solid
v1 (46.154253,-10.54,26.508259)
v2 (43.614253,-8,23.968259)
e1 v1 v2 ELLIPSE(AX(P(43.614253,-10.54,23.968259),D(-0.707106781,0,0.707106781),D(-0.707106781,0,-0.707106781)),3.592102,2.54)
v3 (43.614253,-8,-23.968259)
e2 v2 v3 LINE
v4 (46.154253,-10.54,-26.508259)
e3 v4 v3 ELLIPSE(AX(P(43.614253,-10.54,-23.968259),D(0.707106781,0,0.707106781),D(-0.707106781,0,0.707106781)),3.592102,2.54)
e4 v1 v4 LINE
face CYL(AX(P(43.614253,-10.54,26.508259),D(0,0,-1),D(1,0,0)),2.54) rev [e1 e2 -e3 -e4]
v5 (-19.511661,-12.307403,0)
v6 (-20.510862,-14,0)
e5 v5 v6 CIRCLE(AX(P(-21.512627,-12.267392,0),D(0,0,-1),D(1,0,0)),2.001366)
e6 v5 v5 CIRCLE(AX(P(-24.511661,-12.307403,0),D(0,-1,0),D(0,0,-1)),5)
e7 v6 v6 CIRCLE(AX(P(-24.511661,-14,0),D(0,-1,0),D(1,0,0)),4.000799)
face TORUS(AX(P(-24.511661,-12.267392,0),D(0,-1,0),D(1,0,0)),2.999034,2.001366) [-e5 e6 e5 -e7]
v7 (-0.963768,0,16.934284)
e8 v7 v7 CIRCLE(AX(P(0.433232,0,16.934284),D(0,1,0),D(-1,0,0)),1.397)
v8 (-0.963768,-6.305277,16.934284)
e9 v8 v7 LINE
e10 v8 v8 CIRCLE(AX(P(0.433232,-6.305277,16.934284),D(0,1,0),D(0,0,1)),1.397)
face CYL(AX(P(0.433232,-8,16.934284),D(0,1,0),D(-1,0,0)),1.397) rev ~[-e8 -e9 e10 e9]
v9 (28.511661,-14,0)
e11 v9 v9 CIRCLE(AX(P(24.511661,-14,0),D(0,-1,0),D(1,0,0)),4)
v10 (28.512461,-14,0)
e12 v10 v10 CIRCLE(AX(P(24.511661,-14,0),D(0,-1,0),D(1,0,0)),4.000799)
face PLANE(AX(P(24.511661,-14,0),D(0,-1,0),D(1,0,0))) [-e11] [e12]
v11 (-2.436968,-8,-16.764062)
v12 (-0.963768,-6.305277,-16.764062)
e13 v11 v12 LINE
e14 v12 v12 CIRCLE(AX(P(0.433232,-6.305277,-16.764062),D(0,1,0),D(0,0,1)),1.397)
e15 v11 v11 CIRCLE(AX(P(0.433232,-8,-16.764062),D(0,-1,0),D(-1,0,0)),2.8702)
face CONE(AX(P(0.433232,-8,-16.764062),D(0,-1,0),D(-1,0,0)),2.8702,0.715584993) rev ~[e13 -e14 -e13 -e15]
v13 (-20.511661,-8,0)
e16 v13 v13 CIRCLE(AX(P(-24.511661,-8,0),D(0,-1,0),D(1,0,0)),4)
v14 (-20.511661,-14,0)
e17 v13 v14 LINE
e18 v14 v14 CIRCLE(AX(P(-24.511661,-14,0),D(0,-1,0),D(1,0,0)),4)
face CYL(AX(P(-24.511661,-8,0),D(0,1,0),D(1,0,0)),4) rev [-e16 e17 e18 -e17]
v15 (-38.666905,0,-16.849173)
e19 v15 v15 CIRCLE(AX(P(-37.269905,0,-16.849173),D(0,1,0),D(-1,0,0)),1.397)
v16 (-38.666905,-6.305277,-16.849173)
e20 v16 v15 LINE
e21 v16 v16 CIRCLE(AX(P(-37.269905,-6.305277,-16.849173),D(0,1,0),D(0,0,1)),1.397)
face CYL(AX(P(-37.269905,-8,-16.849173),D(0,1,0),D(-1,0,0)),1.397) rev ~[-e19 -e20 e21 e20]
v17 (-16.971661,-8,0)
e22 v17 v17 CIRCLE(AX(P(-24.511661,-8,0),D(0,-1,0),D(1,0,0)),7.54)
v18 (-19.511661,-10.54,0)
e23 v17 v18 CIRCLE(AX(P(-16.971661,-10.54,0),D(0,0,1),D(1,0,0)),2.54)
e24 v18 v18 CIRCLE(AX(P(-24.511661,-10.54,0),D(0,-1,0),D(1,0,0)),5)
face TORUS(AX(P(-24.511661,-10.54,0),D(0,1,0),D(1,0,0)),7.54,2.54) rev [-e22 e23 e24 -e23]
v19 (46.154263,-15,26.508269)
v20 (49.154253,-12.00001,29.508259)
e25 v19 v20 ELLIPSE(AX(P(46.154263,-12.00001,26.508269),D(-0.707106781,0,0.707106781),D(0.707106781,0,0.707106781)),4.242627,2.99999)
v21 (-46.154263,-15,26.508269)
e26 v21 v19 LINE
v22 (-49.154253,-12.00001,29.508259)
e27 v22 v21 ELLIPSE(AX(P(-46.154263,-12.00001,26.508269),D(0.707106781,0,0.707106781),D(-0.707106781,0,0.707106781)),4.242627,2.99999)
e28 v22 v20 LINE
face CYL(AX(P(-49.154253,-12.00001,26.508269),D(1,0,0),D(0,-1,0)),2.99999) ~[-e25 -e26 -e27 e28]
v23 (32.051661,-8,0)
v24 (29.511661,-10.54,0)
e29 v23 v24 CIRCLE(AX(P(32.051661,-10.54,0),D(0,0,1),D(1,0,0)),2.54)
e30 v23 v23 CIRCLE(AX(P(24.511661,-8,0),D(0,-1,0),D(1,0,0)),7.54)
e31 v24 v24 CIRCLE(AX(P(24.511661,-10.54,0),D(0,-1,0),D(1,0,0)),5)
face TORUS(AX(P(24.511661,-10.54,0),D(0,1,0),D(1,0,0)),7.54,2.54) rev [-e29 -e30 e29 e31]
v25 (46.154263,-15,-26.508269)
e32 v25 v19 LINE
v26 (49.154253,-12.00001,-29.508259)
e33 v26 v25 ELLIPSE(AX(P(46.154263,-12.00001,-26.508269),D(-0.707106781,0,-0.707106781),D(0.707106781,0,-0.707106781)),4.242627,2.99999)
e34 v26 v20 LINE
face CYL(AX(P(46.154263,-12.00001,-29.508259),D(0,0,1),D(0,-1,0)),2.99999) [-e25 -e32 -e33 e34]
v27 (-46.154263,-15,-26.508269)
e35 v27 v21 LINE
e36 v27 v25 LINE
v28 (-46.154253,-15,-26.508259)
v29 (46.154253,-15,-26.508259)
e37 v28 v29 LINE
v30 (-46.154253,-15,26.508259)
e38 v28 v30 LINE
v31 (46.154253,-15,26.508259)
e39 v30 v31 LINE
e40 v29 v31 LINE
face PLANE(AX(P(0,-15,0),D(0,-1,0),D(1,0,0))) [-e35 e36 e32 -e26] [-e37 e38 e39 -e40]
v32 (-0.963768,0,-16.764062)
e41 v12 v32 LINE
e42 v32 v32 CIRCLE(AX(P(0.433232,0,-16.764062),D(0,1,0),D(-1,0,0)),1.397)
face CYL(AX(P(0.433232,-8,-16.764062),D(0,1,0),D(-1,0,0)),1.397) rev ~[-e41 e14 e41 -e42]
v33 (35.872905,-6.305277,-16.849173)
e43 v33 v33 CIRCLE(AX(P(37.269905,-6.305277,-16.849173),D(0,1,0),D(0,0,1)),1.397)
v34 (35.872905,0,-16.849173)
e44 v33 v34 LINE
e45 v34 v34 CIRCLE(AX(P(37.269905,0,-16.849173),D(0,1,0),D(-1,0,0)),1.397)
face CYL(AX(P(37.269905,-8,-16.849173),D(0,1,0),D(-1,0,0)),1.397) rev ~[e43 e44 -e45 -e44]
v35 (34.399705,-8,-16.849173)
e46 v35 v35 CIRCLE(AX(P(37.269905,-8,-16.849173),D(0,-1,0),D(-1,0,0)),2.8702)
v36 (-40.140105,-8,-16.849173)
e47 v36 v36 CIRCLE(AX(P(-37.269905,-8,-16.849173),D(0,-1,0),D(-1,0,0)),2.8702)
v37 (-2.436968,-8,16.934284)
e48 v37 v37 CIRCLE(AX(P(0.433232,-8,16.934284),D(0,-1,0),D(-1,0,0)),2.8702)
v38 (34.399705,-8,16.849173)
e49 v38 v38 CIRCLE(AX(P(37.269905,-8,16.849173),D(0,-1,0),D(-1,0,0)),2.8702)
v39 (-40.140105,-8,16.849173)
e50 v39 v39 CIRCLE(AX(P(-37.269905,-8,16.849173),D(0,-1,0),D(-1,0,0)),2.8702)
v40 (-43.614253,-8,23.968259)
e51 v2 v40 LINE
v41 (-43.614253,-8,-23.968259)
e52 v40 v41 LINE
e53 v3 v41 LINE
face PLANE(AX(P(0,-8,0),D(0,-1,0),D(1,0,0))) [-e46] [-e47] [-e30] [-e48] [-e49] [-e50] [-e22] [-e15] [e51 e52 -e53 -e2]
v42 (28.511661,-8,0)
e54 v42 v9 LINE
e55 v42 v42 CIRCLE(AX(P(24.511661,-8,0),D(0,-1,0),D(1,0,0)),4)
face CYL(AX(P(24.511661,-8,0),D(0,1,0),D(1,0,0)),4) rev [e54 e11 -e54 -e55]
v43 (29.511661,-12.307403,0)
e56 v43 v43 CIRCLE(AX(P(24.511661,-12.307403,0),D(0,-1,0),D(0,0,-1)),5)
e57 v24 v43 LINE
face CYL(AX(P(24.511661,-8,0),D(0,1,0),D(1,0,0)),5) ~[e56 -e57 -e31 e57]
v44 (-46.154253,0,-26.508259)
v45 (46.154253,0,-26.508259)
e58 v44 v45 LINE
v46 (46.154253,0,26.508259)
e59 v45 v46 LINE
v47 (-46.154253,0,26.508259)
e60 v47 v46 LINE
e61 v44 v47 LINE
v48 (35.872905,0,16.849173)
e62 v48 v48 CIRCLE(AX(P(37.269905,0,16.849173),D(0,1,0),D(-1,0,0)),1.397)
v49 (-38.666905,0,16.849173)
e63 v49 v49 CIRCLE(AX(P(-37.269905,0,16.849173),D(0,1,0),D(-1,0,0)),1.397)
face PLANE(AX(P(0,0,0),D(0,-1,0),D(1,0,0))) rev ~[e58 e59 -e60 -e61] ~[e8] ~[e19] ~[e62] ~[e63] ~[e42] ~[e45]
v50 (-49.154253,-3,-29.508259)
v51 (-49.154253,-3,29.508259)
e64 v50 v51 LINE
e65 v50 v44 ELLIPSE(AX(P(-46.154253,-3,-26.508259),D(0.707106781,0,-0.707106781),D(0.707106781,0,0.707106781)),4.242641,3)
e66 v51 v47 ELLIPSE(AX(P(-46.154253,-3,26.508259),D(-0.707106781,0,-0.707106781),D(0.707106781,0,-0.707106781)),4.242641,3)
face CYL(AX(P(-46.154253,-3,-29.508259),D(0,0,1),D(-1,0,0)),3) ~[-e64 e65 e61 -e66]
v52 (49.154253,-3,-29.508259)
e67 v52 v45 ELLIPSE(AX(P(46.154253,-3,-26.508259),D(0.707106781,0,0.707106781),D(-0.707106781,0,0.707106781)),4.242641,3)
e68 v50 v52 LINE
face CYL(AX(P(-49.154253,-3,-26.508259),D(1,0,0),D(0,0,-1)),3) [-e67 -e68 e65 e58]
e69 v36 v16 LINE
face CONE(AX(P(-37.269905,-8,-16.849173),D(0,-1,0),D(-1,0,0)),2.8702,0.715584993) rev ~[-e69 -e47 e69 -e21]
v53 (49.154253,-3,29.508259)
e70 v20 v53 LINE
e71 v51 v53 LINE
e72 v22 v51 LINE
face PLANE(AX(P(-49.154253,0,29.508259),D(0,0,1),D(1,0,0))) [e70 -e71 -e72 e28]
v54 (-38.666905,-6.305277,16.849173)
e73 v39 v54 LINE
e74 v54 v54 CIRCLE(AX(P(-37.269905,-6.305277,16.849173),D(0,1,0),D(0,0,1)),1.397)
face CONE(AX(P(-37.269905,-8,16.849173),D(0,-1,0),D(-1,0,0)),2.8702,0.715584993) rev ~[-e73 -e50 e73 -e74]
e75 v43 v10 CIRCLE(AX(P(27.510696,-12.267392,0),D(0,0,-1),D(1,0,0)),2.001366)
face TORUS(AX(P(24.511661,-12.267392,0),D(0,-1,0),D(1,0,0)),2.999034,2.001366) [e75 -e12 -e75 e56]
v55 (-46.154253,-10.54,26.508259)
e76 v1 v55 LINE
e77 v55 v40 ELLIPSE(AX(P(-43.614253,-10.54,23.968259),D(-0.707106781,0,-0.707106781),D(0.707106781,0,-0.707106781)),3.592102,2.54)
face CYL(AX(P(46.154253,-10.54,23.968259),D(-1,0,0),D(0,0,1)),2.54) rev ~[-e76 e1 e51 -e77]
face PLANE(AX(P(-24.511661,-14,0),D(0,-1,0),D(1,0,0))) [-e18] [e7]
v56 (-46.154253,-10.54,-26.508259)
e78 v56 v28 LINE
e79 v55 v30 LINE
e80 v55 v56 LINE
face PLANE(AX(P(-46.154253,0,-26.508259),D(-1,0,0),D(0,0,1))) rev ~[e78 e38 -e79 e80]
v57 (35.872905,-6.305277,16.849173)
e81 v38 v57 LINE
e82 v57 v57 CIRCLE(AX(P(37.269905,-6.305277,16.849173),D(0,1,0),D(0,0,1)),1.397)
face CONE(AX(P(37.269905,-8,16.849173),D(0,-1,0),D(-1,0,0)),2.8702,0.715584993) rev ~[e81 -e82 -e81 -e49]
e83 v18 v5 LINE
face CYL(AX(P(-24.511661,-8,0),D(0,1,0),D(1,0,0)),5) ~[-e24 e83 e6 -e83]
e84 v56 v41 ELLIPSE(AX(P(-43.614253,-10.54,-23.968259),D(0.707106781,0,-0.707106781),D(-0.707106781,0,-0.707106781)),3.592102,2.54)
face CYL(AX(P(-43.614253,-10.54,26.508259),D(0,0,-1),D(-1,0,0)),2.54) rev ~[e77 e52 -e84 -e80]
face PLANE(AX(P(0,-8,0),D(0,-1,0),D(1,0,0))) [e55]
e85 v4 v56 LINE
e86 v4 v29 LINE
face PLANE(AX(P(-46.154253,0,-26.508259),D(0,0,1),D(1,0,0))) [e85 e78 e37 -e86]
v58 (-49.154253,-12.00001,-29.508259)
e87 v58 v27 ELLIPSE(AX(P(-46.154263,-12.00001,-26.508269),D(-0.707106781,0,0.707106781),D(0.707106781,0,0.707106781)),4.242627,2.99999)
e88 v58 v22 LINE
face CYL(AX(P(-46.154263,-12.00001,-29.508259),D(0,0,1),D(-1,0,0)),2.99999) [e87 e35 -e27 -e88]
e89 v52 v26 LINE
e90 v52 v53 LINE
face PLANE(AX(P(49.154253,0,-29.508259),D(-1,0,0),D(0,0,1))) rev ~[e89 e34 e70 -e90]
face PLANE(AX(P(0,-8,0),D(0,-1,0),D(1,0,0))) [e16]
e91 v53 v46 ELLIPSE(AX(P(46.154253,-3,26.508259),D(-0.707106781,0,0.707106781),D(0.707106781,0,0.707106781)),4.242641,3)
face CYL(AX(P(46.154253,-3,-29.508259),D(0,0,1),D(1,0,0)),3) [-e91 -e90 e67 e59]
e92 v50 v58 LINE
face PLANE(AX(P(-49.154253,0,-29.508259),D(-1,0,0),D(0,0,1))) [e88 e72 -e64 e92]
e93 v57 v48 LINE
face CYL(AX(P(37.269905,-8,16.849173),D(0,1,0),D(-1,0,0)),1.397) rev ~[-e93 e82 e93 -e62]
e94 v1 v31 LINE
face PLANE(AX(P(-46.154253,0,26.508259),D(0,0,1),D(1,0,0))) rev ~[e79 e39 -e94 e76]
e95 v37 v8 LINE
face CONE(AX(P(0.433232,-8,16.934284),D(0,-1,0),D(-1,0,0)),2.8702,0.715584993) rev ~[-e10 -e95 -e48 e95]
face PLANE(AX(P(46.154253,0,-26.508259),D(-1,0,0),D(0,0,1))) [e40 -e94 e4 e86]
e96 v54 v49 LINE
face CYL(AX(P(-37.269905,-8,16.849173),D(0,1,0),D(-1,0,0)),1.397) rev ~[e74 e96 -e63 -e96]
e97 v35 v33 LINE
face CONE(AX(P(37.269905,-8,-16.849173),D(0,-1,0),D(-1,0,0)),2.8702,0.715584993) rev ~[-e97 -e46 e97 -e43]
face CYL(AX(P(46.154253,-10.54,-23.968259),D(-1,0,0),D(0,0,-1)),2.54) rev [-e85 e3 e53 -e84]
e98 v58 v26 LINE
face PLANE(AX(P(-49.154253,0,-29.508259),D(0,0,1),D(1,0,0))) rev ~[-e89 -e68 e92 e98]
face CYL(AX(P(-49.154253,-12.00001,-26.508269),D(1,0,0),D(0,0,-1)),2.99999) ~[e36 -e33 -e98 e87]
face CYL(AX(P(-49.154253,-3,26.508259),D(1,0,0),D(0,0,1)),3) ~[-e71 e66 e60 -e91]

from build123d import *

# Parameters (mm, degrees)
F0_W            = 98.3085063696
F0_H            = 59.0165173113
F0_W_2          = 92.3085063696
F0_H_2          = 53.0165173113
F1_DEPTH        = 8
F2_DEPTH        = 15
F3_R            = 5
F3_R_2          = 4
F4_DEPTH        = 6
F5_R            = 2.54
F6_R            = 3
F7_R            = 2.99999
F10_D           = 2.794
F10_CSINK_D     = 5.7404
F10_CSINK_ANGLE = 82


# Not quite as in the source:
# - a fillet or chamfer that OpenCascade refuses, or shapes differently, is made with other operations: its cross-section is extruded or revolved along the edge and cut away or added
# - a fillet or chamfer is up to 0.001 mm smaller than in the source, because OpenCascade refuses the exact size


with BuildPart() as f1:
    # F0 (on Front) → F1 (new body)
    with BuildSketch(Plane.XZ):
        Rectangle(F0_W, F0_H)
        Rectangle(F0_W_2, F0_H_2, mode=Mode.SUBTRACT)
        Rectangle(F0_W_2, F0_H_2)
    extrude(amount=F1_DEPTH)

    # F0 (on Front) → F2 (join)
    with BuildSketch(Plane.XZ):
        Rectangle(F0_W, F0_H)
        Rectangle(F0_W_2, F0_H_2, mode=Mode.SUBTRACT)
    extrude(amount=F2_DEPTH)

    # F3 (on face) → F4 (join)
    with BuildSketch(Plane.XZ.offset(8)):
        with Locations((-24.5116613805, 0)):
            Circle(F3_R)
        with Locations((-24.5116613805, 0)):
            Circle(F3_R_2, mode=Mode.SUBTRACT)
        with Locations((24.5116613805, 0)):
            Circle(F3_R)
        with Locations((24.5116613805, 0)):
            Circle(F3_R_2, mode=Mode.SUBTRACT)
    extrude(amount=F4_DEPTH)

    # F5
    f5_edges = [f1.edges().sort_by_distance(p)[0] for p in [
        (-29.511661, -8, 0),
        (19.511661, -8, 0),
        (0, -8, -26.508259),
        (46.154253, -8, 0),
        (-46.154253, -8, 0),
        (0, -8, 26.508259),
    ]]
    fillet(f5_edges, radius=F5_R)

    # F6
    f6_edges = [f1.edges().sort_by_distance(p)[0] for p in [
        (0, 0, 29.508259),
        (49.154253, 0, 0),
        (0, 0, -29.508259),
        (-49.154253, 0, 0),
    ]]
    fillet(f6_edges, radius=F6_R)

    # F7 (radius 3 in the source; OpenCascade refuses exactly that, so slightly less here)
    f7_edges = [f1.edges().sort_by_distance(p)[0] for p in [
        (0, -15, -29.508259),
        (49.154253, -15, 0),
        (-49.154253, -15, 0),
        (0, -15, 29.508259),
    ]]
    fillet(f7_edges, radius=F7_R)

    # F8: fillet of radius 2 on 2 edges, made by hand

    # F8_s1 → F8_t2 (revolve, cut)
    with BuildSketch(Plane.XY):
        with BuildLine():
            ThreePointArc((29.5120613805, -12.2673917434), (29.2440686279, -13.2678330874), (28.5118614771, -14.0003463544))
            Line((28.5118614771, -14.0003463544), (28.6119780552, -14.1736418155))
            ThreePointArc((28.6119780552, -14.1736418155), (29.0117614288, -14.2001365685), (29.5116613805, -14.2001365685))
            Line((29.5116613805, -14.2001365685), (29.7117979491, -14))
            ThreePointArc((29.7117979491, -14), (29.7117979491, -13.1336958717), (29.7121979491, -12.2673917434))
            Line((29.7121979491, -12.2673917434), (29.5120613805, -12.2673917434))
        make_face()
    revolve(axis=Axis((24.5116613805, -14, 0), (0, -1, 0)), mode=Mode.SUBTRACT)

    # F8_s3 → F8_t4 (revolve, cut)
    with BuildSketch(Plane.XY):
        with BuildLine():
            ThreePointArc((-19.5112613805, -12.2673917434), (-19.7792541332, -13.2678330874), (-20.511461284, -14.0003463544))
            Line((-20.511461284, -14.0003463544), (-20.4113447058, -14.1736418155))
            ThreePointArc((-20.4113447058, -14.1736418155), (-20.0115613323, -14.2001365685), (-19.5116613805, -14.2001365685))
            Line((-19.5116613805, -14.2001365685), (-19.311524812, -14))
            ThreePointArc((-19.311524812, -14), (-19.311524812, -13.1336958717), (-19.311124812, -12.2673917434))
            Line((-19.311124812, -12.2673917434), (-19.5112613805, -12.2673917434))
        make_face()
    revolve(axis=Axis((-24.5116613805, -14, 0), (0, -1, 0)), mode=Mode.SUBTRACT)

    # F10 (through all)
    with Locations(Plane.XZ.offset(8)):
        with Locations((37.2699052095, 16.8491732329), (37.2699052095, -16.8491732329), (0.4332323442, -16.7640619911), (0.4332323442, 16.9342844747), (-37.2699052095, 16.8491732329), (-37.2699052095, -16.8491732329)):
            CounterSinkHole(F10_D / 2, F10_CSINK_D / 2, counter_sink_angle=F10_CSINK_ANGLE)


solid = f1.part
